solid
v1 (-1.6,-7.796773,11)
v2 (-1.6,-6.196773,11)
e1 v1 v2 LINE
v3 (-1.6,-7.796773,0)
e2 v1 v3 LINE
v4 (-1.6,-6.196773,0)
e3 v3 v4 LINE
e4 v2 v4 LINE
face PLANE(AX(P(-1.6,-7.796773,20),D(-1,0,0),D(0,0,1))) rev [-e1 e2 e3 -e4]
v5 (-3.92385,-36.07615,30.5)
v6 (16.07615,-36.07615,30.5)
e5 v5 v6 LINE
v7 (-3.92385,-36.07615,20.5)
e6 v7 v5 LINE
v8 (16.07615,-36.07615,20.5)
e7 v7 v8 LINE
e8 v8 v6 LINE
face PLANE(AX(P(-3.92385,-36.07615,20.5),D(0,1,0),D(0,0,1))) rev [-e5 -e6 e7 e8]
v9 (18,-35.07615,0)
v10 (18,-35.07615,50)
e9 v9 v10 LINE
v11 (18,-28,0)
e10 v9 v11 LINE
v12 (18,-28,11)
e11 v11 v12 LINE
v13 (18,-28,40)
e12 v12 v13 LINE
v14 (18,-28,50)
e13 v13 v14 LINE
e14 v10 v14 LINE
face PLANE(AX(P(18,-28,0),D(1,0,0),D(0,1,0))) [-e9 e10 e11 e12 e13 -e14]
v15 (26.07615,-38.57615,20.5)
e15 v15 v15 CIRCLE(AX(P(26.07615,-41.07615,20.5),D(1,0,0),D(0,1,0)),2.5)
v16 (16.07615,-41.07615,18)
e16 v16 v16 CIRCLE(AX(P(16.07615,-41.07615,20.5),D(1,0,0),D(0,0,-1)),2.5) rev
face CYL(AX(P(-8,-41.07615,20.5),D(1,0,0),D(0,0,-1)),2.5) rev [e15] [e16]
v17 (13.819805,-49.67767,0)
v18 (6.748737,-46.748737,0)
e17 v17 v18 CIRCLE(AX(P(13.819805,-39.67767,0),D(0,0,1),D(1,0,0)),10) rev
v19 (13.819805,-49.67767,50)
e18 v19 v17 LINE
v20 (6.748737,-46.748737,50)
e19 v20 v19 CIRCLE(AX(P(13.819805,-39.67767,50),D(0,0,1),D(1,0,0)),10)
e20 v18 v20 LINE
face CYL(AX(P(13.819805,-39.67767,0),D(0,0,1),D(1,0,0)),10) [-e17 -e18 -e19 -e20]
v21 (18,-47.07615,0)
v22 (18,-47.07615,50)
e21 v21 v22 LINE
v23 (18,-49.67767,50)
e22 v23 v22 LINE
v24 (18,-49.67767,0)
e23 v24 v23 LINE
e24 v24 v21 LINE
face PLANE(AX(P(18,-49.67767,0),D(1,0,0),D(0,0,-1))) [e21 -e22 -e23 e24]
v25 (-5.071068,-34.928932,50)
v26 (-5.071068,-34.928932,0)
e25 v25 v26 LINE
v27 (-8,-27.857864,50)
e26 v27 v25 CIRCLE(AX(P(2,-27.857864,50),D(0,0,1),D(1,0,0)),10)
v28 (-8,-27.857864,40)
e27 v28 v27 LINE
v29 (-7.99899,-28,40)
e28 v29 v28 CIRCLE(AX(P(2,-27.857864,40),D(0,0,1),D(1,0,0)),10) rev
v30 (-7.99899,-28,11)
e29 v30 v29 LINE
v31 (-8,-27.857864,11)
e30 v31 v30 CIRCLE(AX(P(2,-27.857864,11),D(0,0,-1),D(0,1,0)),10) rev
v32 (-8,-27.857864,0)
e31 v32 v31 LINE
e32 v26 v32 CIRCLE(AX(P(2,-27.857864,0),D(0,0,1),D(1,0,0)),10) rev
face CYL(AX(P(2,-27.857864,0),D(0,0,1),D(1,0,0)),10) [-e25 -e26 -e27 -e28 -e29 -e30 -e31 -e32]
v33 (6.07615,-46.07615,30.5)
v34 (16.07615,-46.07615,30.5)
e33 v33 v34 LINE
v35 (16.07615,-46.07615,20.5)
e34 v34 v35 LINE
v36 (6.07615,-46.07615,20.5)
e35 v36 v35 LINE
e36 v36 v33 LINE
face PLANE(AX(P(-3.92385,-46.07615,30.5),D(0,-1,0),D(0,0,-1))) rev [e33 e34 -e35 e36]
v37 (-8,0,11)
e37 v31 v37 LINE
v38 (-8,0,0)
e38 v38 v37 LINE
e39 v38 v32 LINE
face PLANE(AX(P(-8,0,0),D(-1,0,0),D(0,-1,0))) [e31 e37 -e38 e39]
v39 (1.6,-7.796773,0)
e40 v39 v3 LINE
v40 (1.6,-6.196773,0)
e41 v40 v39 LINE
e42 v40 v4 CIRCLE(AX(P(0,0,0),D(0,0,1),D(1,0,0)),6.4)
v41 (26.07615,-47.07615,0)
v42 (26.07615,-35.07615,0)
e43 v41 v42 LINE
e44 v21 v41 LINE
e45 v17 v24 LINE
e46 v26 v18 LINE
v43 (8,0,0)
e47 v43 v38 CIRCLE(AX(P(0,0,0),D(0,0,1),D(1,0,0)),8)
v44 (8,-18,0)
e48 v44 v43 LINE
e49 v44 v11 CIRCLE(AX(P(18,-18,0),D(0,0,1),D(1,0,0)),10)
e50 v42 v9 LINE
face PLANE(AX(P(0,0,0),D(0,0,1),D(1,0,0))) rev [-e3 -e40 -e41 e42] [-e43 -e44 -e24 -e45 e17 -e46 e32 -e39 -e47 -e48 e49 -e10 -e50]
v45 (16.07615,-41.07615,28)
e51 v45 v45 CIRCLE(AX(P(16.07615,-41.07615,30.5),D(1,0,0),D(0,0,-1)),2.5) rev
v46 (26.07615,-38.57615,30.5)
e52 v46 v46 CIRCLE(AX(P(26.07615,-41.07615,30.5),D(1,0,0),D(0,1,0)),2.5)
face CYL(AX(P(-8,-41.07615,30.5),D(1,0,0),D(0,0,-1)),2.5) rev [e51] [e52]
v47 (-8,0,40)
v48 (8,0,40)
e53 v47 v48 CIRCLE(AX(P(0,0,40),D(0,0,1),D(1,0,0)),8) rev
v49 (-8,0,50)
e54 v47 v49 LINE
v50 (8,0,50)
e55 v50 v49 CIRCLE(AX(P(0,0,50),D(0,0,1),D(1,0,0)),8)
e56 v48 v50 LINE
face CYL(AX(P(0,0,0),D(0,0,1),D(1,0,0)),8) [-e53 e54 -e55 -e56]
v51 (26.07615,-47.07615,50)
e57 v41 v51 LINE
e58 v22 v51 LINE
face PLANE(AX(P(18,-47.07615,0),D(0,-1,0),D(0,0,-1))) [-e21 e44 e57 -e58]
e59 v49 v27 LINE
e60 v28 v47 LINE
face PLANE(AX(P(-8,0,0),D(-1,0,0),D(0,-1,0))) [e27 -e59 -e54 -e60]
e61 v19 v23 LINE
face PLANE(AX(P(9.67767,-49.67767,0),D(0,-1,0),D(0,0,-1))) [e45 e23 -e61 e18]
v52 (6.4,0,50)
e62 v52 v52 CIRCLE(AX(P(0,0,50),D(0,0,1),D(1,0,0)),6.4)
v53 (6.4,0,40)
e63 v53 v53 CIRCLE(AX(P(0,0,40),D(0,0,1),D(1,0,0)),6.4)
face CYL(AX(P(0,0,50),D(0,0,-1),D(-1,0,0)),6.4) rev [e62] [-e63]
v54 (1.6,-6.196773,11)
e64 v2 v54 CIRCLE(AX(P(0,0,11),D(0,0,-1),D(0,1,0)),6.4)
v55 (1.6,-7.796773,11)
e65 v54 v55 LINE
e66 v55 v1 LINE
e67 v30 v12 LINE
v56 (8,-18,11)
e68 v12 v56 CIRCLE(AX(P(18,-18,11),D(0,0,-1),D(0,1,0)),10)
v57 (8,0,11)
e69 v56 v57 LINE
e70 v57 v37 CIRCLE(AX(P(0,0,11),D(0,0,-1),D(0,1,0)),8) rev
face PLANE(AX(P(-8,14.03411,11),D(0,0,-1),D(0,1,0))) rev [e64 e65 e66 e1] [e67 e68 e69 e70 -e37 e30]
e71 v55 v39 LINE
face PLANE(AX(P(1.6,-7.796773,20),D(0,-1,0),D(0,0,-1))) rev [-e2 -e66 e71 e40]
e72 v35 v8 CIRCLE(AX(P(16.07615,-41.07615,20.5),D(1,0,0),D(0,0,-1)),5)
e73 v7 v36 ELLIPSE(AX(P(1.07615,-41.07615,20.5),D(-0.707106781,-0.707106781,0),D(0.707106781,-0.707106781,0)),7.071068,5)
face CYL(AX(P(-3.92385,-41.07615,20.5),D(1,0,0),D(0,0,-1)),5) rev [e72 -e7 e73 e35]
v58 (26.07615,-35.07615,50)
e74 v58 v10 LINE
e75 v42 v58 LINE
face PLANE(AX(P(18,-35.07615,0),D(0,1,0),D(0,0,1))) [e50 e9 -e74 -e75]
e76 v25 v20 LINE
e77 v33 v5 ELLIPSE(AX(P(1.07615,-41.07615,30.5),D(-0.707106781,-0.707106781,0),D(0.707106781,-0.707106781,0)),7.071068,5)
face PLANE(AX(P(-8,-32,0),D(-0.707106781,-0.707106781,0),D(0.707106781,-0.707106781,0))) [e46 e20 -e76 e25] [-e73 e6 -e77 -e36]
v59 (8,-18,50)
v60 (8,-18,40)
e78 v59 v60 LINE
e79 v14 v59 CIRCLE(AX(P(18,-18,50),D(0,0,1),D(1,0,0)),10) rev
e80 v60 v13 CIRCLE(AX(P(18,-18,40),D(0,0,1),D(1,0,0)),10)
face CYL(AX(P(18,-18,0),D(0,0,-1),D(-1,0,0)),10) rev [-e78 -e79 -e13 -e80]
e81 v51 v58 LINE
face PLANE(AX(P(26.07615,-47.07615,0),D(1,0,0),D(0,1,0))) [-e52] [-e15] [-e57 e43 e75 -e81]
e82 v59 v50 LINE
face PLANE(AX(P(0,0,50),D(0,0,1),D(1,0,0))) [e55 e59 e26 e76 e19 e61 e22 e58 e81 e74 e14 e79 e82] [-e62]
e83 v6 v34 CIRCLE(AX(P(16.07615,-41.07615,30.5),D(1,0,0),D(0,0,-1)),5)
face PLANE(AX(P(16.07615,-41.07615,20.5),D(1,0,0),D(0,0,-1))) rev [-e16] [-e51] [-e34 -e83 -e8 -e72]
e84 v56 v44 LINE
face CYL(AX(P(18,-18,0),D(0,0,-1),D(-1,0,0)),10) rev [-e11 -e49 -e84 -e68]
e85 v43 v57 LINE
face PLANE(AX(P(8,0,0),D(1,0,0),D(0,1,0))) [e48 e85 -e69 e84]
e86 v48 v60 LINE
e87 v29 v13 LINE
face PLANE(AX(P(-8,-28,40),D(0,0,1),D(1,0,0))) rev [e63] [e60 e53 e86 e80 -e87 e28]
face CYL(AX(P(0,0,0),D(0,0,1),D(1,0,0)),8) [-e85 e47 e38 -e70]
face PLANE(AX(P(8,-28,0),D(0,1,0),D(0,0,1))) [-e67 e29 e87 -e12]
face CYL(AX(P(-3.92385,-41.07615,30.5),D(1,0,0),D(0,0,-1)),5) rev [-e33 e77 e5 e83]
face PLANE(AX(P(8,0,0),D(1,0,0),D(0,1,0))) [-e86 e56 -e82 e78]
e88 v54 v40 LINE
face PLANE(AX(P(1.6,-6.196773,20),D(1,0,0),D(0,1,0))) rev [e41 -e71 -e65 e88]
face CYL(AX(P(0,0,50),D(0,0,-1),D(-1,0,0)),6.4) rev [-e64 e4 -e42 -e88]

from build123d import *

# Parameters (mm, degrees)
SKETCH1_R               = 12
SKETCH1_R_2             = 6.4
BOSS_EXTRUDE1_DEPTH     = 50
CUT_EXTRUDE1_DEPTH      = 53.80151513
CUT_EXTRUDE1_DEPTH_BACK = 53.80151513
SKETCH2_R               = 12
SKETCH2_R_2             = 8
BOSS_EXTRUDE2_DEPTH     = 50
SKETCH4_W               = 29
SKETCH4_H               = 42.03410999
CUT_EXTRUDE2_DEPTH      = 79.288280436
CUT_EXTRUDE6_DEPTH      = 79.288280436
CUT_EXTRUDE6_DEPTH_BACK = 79.288280436
SKETCH8_R               = 2.5
CUT_EXTRUDE9_START      = -10
CUT_EXTRUDE9_DEPTH      = 20
SKETCH10_W              = 3.2
SKETCH10_H              = 1.6
CUT_EXTRUDE10_DEPTH     = 20
FILLET1_R               = 10


with BuildPart() as part:
    # Sketch1 → Boss-Extrude1 (new body)
    with BuildSketch(Plane.XY):
        Circle(SKETCH1_R)
        Circle(SKETCH1_R_2, mode=Mode.SUBTRACT)
    extrude(amount=BOSS_EXTRUDE1_DEPTH)

    # Sketch2 → Cut-Extrude1 (cut, two sides: drawn at the far end of the back side and taken through both)
    with BuildSketch(Plane.XY.offset(50).offset(-CUT_EXTRUDE1_DEPTH_BACK)):
        Circle(SKETCH2_R)
        Circle(SKETCH2_R_2, mode=Mode.SUBTRACT)
    extrude(amount=CUT_EXTRUDE1_DEPTH + CUT_EXTRUDE1_DEPTH_BACK, mode=Mode.SUBTRACT)

    # Sketch3 → Boss-Extrude2 (add, through all)
    with BuildSketch(Plane.XY.offset(50)):
        with BuildLine():
            Line((-8, 0), (-8, -32))
            Line((-8, -32), (9.67766953, -49.67766953))
            Line((9.67766953, -49.67766953), (18, -49.67766953))
            Line((18, -49.67766953), (18, -47.076150072))
            Line((18, -47.076150072), (26.076150072, -47.076150072))
            Line((26.076150072, -47.076150072), (26.076150072, -35.076150072))
            Line((26.076150072, -35.076150072), (18, -35.076150072))
            Line((18, -35.076150072), (18, -28))
            Line((18, -28), (8, -28))
            Line((8, -28), (8, 0))
            ThreePointArc((8, 0), (0, -8), (-8, 0))
        make_face()
    extrude(amount=-BOSS_EXTRUDE2_DEPTH)

    # Sketch4 → Cut-Extrude2 (cut, through all)
    with BuildSketch(Plane(origin=(26.076150072, 0, 0), x_dir=(0, 0, -1), z_dir=(1, 0, 0))):
        with Locations((-25.5, -6.982945005)):
            Rectangle(SKETCH4_W, SKETCH4_H)
    extrude(amount=-CUT_EXTRUDE2_DEPTH, mode=Mode.SUBTRACT)

    # Sketch8 → Cut-Extrude6 (cut, two sides: drawn at the far end of the back side and taken through both)
    with BuildSketch(Plane(origin=(26.076150072, 0, 0), x_dir=(0, 0, -1), z_dir=(1, 0, 0)).offset(-CUT_EXTRUDE6_DEPTH_BACK)):
        with Locations(Location((-30.5, -41.076150072, 0), (0, 0, 90))):
            Circle(SKETCH8_R)
        with Locations(Location((-20.5, -41.076150072, 0), (0, 0, 90))):
            Circle(SKETCH8_R)
    extrude(amount=CUT_EXTRUDE6_DEPTH + CUT_EXTRUDE6_DEPTH_BACK, mode=Mode.SUBTRACT)

    # Sketch9 → Cut-Extrude9 (cut)
    with BuildSketch(Plane(origin=(26.076150072, 0, 0), x_dir=(0, 0, -1), z_dir=(1, 0, 0)).offset(CUT_EXTRUDE9_START)):
        with BuildLine():
            Line((-20.5, -36.076150072), (-30.5, -36.076150072))
            ThreePointArc((-30.5, -36.076150072), (-35.5, -41.076150072), (-30.5, -46.076150072))
            Line((-30.5, -46.076150072), (-20.5, -46.076150072))
            ThreePointArc((-20.5, -46.076150072), (-15.5, -41.076150072), (-20.5, -36.076150072))
        make_face()
    extrude(amount=-CUT_EXTRUDE9_DEPTH, mode=Mode.SUBTRACT)

    # Sketch10 → Cut-Extrude10 (cut)
    with BuildSketch(Plane(origin=(0, 0, 0), x_dir=(-1, 0, 0), z_dir=(0, 0, -1))):
        with Locations((0, -6.996773354)):
            Rectangle(SKETCH10_W, SKETCH10_H)
    extrude(amount=-CUT_EXTRUDE10_DEPTH, mode=Mode.SUBTRACT)

    # Fillet1
    # the kernel refuses this fillet: 10 mm, written as the material it adds along each edge
    with BuildSketch(Plane(origin=(8, -28, 11), x_dir=(0, 1, 0), z_dir=(0, 0, -1))) as fillet1_piece_1:
        with BuildLine():
            CenterArc((FILLET1_R, FILLET1_R), FILLET1_R, 180, 90)
            Line((0, FILLET1_R), (0, 0))
            Line((0, 0), (FILLET1_R, 0))
        make_face()
    extrude(amount=11)
    with BuildSketch(Plane(origin=(8, -28, 50), x_dir=(1, 0, 0), z_dir=(0, 0, -1))) as fillet1_piece_2:
        with BuildLine():
            CenterArc((FILLET1_R, -FILLET1_R), FILLET1_R, 90, 90)
            Line((0, -FILLET1_R), (0, 0))
            Line((0, 0), (FILLET1_R, 0))
        make_face()
    extrude(amount=10)
    # the kernel refuses this fillet: 10 mm, written as the material it takes off along each edge
    with BuildSketch(Plane(origin=(-8, -32, 60.355339059), x_dir=(0.7071067811865476, -0.7071067811865474, 0), z_dir=(0, 0, -1)), Plane(origin=(9.67766953, -49.67766953, 60.355339059), x_dir=(1, 0, 0), z_dir=(0, 0, -1))) as fillet1_2_piece_1:
        with BuildLine():
            CenterArc((FILLET1_R * 0.414213562373, -FILLET1_R), FILLET1_R, 90, 45)
            Line((-FILLET1_R * 0.292893218813, -FILLET1_R * 0.292893218813), (0, 0))
            Line((0, 0), (FILLET1_R * 0.414213562373, 0))
        make_face()
    extrude(amount=70.710678119, mode=Mode.SUBTRACT)


solid = part.part
